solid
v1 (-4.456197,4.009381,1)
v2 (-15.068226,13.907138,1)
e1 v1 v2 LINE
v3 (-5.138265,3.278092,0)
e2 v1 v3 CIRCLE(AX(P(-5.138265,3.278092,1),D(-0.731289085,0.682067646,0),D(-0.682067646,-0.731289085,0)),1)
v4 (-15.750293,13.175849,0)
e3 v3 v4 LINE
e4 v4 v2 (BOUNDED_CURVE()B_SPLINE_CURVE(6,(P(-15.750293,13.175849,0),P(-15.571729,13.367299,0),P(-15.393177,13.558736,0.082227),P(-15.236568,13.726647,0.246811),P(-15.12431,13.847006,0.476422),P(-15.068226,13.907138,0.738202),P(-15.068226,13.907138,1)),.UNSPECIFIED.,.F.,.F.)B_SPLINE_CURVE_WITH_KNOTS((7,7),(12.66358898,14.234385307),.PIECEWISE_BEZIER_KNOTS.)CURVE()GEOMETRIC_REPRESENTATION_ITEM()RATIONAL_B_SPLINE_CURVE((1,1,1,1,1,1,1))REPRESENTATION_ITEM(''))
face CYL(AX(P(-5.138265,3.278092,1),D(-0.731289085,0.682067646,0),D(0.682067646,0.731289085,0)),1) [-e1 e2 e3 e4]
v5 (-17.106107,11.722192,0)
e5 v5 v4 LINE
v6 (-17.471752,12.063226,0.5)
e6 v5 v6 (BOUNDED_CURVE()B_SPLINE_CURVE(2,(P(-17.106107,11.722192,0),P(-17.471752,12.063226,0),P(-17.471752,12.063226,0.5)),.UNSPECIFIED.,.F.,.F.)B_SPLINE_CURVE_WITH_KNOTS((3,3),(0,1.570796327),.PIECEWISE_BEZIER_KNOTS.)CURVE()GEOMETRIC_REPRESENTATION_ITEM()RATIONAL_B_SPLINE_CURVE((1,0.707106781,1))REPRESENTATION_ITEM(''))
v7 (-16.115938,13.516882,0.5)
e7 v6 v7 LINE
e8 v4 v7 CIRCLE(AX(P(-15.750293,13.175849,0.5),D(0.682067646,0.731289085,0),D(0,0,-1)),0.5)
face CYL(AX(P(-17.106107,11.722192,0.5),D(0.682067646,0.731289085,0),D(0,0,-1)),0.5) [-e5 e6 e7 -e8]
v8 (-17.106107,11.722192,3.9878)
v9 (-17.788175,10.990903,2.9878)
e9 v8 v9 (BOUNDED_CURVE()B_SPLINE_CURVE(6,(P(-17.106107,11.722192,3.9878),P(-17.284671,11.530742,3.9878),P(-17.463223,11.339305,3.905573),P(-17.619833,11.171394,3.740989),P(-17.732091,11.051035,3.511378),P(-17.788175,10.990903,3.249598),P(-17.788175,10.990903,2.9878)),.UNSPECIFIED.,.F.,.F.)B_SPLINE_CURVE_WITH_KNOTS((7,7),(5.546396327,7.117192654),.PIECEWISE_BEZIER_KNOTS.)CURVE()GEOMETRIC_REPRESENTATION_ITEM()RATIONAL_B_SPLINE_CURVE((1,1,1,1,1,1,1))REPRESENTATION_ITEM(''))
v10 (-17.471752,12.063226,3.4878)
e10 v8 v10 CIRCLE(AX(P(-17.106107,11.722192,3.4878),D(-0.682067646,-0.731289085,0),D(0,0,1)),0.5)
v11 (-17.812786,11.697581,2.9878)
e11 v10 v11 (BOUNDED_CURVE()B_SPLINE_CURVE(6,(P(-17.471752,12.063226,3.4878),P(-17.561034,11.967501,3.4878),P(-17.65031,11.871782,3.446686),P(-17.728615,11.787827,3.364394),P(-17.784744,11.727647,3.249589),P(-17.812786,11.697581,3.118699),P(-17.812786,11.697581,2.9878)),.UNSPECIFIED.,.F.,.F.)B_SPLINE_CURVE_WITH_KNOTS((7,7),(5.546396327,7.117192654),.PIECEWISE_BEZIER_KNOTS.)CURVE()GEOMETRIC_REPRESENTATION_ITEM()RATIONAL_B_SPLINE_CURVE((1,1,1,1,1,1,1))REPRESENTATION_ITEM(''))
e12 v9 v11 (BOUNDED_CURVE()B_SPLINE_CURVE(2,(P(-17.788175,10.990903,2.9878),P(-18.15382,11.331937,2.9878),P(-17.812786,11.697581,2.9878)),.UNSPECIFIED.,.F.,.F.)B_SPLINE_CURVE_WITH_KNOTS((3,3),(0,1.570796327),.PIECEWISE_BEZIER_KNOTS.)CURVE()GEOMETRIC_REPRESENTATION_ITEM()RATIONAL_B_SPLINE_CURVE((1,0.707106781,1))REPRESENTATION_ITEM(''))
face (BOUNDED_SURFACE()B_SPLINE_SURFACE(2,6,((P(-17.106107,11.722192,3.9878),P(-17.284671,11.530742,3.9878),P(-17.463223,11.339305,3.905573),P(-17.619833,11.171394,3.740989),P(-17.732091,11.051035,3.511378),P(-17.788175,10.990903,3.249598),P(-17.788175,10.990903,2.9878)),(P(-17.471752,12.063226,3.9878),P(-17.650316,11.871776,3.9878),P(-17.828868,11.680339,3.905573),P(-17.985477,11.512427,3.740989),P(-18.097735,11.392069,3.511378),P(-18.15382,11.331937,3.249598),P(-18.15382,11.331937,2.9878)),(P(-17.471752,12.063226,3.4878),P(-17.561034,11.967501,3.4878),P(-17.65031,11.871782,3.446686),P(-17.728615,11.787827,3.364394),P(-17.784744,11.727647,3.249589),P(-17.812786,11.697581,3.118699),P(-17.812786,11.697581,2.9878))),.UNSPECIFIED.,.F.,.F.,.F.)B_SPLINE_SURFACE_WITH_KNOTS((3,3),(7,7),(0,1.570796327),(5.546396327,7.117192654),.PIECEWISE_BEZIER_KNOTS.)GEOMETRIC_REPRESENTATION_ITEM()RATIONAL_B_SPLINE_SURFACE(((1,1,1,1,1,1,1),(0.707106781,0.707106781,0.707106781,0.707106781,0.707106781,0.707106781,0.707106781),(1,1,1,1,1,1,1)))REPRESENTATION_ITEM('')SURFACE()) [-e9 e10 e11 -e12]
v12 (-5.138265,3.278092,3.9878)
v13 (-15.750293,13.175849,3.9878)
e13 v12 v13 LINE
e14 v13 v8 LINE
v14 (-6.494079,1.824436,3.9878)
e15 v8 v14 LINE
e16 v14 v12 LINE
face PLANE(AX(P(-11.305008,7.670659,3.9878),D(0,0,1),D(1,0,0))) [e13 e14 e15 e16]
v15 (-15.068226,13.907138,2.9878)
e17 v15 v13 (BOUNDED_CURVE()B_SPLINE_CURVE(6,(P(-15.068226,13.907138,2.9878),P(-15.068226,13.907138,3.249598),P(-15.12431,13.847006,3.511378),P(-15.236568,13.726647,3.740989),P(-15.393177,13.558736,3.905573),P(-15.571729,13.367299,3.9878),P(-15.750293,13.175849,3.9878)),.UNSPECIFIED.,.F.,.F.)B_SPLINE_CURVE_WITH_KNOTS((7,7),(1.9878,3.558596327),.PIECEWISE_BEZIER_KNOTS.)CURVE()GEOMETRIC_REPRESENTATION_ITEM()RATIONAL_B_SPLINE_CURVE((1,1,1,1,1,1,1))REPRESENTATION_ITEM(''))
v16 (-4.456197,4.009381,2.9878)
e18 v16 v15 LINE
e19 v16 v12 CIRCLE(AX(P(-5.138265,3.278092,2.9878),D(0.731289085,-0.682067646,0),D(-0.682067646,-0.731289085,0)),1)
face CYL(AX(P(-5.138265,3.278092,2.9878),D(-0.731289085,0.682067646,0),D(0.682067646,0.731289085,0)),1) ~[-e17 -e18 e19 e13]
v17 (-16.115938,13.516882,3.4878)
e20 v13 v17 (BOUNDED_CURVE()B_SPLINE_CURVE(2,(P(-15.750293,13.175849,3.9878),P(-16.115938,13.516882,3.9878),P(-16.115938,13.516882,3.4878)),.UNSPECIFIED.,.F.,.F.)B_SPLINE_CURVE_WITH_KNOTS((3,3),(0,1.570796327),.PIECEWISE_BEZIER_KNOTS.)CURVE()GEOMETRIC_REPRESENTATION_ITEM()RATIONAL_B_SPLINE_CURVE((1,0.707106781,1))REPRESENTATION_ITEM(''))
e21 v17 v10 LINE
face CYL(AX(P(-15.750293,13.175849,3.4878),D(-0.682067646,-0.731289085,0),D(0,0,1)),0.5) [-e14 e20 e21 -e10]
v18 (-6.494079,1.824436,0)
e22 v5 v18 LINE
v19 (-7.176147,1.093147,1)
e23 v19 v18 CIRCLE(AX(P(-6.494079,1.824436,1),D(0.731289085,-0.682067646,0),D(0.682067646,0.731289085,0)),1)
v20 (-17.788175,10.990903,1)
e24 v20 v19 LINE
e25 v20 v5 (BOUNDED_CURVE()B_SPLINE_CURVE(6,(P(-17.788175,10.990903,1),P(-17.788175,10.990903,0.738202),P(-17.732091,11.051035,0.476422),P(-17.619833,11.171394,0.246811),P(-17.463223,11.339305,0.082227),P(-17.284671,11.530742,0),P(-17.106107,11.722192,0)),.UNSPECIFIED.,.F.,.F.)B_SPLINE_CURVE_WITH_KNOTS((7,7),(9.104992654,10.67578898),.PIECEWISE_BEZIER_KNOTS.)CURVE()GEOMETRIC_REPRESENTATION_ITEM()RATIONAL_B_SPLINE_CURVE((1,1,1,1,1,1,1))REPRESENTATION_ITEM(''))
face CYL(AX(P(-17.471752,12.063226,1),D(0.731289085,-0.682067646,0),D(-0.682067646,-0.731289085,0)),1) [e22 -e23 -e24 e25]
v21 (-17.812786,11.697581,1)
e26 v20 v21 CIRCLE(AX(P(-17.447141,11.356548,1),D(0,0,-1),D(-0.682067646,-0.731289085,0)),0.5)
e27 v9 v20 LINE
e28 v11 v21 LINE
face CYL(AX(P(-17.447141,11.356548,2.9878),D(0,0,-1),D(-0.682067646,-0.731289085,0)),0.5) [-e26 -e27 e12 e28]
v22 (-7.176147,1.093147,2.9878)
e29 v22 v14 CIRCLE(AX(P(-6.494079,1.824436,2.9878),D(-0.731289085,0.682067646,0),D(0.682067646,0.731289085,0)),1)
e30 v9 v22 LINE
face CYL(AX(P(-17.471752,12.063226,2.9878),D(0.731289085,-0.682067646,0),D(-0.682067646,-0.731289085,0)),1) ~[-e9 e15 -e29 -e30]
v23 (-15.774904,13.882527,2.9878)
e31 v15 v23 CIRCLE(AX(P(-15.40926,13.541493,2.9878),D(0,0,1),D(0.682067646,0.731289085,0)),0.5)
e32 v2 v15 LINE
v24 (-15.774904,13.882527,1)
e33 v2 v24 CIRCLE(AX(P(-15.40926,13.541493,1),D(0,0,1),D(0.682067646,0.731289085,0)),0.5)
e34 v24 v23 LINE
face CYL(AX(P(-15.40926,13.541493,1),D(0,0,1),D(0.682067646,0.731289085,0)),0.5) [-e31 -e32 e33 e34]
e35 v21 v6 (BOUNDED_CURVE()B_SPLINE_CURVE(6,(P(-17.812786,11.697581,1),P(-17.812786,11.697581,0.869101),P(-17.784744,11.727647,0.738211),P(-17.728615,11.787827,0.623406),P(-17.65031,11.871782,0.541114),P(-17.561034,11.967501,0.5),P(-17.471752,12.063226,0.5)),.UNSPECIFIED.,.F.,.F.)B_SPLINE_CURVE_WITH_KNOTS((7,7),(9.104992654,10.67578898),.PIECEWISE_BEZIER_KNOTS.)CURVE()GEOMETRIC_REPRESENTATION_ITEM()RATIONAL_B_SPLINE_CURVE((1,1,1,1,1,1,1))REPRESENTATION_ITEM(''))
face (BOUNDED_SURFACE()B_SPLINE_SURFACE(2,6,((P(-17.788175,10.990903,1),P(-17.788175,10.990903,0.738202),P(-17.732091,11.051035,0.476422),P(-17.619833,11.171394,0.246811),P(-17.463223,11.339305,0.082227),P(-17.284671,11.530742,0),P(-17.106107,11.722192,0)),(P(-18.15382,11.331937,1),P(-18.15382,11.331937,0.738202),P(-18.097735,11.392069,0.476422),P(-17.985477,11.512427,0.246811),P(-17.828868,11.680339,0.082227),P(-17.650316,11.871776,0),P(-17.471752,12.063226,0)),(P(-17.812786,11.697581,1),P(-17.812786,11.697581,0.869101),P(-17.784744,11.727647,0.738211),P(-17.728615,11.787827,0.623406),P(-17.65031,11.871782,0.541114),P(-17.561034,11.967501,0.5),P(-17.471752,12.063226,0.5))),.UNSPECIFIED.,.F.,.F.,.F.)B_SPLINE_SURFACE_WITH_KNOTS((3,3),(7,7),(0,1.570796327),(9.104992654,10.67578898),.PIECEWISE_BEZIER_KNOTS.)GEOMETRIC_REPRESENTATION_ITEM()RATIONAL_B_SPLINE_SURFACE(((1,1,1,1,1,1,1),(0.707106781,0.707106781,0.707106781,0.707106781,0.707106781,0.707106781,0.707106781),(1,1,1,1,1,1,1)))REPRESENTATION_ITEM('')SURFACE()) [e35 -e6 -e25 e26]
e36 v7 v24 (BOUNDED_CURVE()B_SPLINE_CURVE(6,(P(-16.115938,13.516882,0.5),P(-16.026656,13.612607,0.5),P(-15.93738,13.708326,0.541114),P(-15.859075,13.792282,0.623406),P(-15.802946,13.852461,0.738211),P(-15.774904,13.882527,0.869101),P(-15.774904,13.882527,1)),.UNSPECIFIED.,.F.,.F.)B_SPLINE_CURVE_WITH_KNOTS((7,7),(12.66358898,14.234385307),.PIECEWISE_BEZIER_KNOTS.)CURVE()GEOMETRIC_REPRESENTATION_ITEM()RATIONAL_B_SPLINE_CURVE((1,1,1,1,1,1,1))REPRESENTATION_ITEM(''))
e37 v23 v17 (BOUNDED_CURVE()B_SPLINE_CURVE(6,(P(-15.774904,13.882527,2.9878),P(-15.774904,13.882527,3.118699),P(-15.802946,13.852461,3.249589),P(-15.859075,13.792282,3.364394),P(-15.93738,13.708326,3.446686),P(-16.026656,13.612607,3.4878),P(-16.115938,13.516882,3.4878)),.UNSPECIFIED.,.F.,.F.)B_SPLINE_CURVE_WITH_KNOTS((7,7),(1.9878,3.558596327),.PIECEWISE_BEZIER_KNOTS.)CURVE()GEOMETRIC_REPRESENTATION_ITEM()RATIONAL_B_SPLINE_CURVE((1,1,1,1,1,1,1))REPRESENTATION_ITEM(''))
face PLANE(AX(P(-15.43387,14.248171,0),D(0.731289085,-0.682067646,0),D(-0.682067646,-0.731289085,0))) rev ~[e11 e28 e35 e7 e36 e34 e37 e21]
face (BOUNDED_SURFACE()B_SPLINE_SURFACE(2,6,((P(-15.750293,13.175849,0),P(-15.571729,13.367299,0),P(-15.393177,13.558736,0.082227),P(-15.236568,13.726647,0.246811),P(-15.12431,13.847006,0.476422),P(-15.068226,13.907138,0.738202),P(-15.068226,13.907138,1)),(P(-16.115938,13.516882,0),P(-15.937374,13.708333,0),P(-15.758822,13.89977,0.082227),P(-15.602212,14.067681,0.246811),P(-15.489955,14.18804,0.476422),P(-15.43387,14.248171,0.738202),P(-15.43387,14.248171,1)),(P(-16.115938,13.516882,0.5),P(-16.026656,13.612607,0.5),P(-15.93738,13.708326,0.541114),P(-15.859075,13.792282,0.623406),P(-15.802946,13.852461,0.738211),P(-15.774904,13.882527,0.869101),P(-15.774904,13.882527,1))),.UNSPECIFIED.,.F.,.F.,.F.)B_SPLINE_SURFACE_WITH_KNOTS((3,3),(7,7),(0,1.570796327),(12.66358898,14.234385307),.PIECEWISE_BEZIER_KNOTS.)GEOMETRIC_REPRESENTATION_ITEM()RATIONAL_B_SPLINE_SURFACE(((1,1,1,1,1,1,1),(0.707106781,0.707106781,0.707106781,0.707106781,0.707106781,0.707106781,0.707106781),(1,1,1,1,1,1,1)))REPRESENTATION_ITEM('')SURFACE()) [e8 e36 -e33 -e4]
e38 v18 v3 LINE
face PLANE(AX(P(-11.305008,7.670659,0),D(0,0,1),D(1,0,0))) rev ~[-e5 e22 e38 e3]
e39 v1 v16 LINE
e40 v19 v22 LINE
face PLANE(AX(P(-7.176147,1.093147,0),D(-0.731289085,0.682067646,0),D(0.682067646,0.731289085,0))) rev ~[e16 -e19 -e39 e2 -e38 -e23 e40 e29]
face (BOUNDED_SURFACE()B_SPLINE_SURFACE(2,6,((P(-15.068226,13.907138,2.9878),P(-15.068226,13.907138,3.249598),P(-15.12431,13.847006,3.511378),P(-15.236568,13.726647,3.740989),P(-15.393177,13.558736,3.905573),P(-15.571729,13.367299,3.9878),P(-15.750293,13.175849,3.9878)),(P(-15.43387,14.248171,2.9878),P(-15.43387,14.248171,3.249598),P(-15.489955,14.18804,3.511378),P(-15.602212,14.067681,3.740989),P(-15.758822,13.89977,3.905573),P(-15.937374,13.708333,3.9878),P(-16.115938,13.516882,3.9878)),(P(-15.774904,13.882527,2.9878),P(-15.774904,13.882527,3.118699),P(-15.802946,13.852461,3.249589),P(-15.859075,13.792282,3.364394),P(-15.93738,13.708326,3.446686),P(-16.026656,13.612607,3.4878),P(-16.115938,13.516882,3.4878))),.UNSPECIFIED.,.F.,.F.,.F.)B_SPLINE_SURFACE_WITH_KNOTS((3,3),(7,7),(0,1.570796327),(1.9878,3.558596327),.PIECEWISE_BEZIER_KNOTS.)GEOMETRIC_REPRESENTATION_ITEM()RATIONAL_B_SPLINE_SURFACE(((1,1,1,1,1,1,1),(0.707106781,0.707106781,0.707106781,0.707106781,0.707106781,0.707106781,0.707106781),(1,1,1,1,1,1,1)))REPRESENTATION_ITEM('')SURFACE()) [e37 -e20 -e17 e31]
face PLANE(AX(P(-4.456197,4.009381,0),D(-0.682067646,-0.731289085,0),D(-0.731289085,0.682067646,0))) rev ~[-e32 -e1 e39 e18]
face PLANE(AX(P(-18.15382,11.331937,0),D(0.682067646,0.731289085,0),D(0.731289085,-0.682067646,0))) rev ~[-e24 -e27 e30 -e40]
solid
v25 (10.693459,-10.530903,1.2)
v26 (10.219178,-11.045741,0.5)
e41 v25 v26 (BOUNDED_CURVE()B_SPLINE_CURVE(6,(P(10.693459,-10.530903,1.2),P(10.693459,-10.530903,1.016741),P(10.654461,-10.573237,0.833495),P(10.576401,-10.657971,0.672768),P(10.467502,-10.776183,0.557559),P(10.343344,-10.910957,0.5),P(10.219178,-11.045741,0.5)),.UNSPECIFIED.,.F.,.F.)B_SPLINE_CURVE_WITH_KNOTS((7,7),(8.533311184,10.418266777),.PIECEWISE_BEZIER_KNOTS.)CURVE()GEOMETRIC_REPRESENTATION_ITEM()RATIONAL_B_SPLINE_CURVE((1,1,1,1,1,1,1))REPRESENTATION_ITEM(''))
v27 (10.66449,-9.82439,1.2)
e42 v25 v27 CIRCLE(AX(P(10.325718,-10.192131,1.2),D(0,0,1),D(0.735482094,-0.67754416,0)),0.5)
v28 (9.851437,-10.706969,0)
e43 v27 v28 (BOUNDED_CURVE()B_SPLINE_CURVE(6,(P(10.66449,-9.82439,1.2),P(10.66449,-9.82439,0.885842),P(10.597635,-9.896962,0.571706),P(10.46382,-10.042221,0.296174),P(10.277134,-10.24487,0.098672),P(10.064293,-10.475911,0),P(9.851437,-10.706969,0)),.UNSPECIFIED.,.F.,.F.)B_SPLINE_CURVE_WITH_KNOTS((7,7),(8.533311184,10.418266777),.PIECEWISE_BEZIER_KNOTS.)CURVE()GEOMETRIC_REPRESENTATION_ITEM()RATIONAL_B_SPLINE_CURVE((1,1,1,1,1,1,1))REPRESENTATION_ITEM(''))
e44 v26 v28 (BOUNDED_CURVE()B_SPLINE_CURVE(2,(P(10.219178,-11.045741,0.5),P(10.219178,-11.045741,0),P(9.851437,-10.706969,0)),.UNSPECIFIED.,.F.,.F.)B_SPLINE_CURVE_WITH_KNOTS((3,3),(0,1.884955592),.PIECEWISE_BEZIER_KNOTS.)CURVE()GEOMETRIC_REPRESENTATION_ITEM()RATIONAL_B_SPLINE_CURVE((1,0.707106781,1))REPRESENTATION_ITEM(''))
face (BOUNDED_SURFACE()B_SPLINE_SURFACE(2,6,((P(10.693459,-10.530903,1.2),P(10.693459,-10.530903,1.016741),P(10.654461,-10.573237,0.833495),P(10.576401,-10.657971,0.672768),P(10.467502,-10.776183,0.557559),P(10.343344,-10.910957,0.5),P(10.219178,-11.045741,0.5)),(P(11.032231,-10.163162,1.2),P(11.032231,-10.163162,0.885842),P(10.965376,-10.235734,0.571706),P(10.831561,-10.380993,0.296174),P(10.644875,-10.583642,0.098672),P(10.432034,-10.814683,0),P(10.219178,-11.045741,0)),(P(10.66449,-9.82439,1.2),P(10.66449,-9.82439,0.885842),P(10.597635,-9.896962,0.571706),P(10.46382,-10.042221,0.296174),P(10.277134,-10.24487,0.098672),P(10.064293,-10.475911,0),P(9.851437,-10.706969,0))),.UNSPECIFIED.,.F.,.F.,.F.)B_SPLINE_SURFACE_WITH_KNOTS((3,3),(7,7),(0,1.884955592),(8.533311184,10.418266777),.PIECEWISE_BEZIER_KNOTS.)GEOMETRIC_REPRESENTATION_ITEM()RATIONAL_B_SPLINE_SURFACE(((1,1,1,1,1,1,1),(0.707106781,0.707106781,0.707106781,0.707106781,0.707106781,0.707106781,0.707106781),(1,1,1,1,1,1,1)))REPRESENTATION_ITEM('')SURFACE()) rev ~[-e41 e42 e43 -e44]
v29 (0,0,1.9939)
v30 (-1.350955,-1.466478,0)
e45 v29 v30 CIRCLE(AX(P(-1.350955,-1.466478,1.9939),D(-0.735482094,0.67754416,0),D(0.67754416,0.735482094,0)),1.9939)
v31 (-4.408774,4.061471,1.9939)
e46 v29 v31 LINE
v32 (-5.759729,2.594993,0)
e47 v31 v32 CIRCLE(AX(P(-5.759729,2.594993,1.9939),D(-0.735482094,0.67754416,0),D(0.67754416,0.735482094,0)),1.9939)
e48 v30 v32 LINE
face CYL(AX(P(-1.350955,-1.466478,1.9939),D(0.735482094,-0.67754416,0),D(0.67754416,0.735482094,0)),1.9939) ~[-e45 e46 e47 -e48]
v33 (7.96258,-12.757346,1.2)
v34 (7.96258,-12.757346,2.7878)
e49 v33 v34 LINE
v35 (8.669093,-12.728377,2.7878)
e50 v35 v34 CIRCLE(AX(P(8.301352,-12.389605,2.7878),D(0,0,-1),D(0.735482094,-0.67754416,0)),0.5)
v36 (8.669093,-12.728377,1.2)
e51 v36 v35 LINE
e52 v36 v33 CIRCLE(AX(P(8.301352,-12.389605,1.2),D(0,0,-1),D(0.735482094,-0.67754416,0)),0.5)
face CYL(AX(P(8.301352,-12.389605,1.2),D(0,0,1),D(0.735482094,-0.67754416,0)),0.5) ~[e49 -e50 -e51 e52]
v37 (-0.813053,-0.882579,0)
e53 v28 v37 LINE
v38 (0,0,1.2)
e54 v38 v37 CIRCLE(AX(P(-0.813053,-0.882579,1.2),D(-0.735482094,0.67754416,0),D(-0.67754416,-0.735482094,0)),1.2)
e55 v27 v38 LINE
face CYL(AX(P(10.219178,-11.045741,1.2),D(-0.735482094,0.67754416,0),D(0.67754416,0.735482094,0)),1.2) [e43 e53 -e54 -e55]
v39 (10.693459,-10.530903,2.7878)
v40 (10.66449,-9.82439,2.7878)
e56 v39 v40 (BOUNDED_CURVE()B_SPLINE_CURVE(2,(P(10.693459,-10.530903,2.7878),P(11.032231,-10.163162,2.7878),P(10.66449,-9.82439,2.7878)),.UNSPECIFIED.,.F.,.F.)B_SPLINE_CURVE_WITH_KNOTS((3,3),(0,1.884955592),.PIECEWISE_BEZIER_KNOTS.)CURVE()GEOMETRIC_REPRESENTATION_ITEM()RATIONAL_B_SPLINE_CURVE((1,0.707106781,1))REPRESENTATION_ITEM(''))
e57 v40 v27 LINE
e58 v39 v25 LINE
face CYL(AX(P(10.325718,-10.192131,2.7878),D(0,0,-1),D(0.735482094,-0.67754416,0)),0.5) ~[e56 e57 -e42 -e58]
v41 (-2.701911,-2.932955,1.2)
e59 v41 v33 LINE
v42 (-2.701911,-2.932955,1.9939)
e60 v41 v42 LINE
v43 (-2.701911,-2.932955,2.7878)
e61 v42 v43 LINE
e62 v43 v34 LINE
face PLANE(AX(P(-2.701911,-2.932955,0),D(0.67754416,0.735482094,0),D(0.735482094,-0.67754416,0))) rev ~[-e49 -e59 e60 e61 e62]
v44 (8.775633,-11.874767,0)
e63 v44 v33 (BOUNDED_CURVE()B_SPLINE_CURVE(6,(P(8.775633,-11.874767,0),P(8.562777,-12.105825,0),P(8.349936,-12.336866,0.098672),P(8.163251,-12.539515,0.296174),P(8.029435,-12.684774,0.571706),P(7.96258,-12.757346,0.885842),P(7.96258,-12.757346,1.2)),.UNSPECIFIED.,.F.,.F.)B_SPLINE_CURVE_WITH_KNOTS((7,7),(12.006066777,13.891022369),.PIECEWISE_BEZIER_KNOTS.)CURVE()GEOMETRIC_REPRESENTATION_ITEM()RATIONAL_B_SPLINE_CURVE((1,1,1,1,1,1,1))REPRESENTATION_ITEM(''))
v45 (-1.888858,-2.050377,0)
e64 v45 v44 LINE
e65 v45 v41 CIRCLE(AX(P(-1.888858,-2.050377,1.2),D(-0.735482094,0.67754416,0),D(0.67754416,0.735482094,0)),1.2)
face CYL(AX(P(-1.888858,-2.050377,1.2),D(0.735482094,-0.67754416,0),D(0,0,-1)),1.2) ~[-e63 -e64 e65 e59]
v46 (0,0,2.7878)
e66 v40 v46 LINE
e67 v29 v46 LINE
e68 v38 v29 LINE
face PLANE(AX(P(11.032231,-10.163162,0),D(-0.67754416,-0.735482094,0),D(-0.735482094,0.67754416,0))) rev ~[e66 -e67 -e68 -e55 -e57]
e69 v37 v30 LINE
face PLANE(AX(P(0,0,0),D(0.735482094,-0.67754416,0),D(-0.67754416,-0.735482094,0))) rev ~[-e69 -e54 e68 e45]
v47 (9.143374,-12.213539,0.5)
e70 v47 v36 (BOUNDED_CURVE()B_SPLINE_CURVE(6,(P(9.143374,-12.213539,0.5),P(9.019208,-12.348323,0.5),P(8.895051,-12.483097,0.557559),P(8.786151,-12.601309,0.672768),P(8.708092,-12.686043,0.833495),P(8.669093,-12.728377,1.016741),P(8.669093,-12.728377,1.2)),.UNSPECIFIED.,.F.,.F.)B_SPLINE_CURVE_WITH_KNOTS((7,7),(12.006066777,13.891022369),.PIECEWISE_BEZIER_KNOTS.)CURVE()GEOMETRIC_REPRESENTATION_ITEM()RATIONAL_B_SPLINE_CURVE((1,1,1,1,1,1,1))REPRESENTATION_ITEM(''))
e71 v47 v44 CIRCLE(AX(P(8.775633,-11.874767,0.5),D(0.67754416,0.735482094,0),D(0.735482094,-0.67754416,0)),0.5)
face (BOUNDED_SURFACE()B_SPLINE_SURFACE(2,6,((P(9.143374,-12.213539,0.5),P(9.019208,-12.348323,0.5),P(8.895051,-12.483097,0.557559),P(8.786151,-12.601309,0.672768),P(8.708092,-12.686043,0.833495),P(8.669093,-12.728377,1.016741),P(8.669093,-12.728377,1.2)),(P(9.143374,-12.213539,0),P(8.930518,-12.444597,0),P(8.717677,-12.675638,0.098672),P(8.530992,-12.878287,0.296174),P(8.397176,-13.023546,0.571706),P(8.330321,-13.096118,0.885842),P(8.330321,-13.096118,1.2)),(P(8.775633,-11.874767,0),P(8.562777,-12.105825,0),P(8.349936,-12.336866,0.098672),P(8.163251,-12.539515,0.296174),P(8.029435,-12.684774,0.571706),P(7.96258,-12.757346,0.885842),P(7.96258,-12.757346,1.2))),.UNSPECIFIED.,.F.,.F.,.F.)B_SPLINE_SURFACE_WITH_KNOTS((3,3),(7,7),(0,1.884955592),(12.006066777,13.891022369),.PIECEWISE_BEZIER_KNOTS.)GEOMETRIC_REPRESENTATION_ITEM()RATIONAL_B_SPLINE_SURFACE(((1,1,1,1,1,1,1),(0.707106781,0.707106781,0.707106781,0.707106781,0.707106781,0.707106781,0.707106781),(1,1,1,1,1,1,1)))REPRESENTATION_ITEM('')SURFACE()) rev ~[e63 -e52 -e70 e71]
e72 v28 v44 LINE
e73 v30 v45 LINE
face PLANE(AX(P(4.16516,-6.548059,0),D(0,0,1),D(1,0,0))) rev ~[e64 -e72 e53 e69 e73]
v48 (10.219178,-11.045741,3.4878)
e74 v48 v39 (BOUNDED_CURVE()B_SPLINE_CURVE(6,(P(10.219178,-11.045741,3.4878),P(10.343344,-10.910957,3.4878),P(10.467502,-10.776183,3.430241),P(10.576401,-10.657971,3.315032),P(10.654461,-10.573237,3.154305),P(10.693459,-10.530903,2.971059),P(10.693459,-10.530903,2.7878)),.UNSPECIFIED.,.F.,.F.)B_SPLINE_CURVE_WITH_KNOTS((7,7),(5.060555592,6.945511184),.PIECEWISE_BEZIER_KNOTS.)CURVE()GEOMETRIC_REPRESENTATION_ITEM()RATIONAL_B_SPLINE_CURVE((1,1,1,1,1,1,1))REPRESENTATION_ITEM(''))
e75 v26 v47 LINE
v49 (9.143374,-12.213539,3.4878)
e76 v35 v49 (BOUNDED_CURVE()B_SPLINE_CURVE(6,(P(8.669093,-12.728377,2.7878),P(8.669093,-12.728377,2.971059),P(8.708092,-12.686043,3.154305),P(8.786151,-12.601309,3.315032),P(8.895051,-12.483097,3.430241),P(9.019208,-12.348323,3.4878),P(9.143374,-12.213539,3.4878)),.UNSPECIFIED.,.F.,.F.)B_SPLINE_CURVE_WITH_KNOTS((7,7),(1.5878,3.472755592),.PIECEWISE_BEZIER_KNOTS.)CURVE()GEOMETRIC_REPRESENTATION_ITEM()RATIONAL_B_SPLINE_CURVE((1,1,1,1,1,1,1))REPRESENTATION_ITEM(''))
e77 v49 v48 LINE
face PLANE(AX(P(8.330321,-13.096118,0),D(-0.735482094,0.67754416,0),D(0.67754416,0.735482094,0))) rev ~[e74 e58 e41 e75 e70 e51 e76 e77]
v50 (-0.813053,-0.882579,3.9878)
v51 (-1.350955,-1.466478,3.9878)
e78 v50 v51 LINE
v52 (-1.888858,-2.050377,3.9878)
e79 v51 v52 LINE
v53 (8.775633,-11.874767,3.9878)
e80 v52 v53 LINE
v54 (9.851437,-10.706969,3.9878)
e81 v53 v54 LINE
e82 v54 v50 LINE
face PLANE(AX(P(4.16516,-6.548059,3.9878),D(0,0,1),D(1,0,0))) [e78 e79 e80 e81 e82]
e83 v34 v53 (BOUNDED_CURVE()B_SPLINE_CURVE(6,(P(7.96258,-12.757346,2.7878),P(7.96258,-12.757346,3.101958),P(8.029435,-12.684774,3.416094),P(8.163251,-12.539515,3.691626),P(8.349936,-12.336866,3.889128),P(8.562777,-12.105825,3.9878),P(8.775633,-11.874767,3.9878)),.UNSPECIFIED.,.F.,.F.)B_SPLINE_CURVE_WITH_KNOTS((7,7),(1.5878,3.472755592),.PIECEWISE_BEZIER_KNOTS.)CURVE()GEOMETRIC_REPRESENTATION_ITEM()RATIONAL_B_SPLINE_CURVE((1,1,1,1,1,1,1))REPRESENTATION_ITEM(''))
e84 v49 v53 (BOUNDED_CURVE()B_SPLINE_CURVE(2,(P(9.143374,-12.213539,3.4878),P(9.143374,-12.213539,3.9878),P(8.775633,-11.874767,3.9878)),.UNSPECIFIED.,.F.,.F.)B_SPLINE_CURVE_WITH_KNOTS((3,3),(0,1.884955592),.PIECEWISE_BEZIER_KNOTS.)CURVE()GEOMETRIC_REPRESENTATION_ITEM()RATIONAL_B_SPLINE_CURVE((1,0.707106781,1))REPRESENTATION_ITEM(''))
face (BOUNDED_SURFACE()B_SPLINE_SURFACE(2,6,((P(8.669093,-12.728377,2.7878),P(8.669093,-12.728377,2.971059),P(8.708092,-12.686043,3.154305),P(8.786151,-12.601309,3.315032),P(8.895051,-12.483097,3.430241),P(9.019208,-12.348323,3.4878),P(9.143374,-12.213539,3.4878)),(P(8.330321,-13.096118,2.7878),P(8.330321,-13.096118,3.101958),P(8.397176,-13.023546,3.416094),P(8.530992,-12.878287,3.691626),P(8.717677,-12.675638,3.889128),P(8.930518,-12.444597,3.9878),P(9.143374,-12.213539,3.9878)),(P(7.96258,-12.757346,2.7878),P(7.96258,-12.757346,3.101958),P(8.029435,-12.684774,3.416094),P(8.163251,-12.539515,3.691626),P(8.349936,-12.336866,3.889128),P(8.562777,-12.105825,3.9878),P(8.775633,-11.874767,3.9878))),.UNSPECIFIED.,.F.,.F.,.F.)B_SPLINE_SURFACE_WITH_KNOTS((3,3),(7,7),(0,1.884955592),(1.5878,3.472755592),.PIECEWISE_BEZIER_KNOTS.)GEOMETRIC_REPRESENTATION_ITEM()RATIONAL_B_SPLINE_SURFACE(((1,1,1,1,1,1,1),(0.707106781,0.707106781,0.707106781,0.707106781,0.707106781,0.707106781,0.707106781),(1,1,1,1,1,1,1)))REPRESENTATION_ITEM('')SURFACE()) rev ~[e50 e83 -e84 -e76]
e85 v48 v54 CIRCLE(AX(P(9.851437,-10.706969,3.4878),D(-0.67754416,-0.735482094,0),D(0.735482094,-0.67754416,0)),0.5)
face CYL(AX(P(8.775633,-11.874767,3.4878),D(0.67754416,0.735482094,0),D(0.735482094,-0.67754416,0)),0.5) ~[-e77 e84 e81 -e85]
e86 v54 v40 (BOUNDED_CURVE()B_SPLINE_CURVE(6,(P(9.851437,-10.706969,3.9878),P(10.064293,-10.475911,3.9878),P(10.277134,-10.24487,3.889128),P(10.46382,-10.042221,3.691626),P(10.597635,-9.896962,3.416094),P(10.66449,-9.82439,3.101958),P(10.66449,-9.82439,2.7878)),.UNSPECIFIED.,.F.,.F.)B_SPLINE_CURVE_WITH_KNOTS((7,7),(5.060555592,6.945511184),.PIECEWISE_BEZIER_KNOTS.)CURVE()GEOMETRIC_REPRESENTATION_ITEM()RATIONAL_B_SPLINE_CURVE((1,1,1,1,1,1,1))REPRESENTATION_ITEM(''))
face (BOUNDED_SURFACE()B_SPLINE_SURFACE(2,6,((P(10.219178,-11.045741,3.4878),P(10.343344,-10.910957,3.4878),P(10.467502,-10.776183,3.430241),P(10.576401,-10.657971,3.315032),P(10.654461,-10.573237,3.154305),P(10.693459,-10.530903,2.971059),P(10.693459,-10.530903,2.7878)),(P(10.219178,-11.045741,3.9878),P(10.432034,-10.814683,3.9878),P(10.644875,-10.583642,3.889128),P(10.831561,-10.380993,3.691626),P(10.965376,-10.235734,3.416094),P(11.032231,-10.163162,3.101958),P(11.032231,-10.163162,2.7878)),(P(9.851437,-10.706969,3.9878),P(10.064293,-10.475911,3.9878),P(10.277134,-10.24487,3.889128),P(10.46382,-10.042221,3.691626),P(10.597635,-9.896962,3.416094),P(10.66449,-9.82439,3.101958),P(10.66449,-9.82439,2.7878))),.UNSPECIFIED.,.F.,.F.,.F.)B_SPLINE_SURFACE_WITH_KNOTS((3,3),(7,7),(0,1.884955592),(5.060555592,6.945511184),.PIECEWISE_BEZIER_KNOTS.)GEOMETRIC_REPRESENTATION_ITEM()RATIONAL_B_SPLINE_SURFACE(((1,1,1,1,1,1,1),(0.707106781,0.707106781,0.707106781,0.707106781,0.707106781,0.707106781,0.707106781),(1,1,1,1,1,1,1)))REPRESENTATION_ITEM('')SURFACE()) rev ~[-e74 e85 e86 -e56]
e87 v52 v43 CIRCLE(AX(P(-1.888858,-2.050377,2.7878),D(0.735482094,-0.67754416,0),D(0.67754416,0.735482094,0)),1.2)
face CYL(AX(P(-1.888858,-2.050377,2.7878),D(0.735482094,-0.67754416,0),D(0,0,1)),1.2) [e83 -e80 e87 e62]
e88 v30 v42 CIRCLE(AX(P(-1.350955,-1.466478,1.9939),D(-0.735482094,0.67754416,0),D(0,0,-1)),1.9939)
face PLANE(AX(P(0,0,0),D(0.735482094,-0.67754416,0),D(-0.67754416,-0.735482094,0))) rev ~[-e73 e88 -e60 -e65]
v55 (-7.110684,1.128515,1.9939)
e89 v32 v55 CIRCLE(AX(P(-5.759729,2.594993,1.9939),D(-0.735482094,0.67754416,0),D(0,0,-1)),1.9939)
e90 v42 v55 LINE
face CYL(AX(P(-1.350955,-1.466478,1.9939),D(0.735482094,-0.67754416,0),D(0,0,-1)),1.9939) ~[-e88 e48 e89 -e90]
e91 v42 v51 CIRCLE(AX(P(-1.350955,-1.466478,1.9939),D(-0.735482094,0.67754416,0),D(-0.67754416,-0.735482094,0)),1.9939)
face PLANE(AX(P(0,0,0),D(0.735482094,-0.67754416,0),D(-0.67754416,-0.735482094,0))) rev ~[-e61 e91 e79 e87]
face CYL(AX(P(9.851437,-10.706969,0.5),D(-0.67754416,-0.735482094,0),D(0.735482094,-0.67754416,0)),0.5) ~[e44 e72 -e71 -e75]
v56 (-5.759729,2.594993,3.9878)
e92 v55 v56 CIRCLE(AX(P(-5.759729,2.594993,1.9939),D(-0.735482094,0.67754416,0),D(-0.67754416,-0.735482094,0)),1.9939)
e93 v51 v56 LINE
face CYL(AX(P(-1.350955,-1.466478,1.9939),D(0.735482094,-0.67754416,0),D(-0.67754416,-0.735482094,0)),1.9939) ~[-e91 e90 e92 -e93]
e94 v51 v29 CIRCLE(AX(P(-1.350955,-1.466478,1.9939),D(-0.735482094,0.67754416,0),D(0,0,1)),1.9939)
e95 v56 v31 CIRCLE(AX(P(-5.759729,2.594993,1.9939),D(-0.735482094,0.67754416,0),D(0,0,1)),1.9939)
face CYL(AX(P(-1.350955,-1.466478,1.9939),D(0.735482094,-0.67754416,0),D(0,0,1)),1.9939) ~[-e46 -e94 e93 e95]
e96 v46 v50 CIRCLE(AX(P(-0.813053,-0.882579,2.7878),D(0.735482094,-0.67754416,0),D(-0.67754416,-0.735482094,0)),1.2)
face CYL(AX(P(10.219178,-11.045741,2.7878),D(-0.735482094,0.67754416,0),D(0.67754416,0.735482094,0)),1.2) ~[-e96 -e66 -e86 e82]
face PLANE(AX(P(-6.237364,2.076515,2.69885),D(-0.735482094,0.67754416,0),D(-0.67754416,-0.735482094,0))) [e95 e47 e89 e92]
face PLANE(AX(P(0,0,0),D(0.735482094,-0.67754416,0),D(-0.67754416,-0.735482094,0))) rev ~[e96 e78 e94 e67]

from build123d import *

# Parameters (mm, degrees)
F1_DEPTH = 3.9878
F3_DEPTH = 5.9944
F4_R     = 1.2
F5_R     = 1
F6_R     = 0.5
F6_2_R   = 0.5


with BuildPart() as f1:
    # F0 (on Top) → F1 (new body)
    with BuildSketch(Plane.XY):
        Polygon((11.0322314148, -10.163162402), (0, 0), (-2.7019106018, -2.9329554957), (8.330320813, -13.0961178978), align=None)
    extrude(amount=F1_DEPTH)

    # F2 (on face) → F3 (join)
    with BuildSketch(Plane(origin=(0, 0, 0), x_dir=(-0.6775441601, -0.7354820943, 0), z_dir=(-0.7354820943, 0.6775441601, 0))):
        Polygon((3.9878, 1.9939), (1.9939, 3.9878), (1.9939, 1.9939), align=None)
        with BuildLine():
            ThreePointArc((3.9878, 1.9939), (3.403800211, 3.403800211), (1.9939, 3.9878))
            Line((1.9939, 3.9878), (3.9878, 1.9939))
        make_face()
        with BuildLine():
            Line((1.9939, 1.9939), (1.9939, 3.9878))
            ThreePointArc((1.9939, 3.9878), (0.583999789, 3.403800211), (0, 1.9939))
            Line((0, 1.9939), (1.9939, 1.9939))
        make_face()
        with BuildLine():
            Line((3.9878, 1.9939), (1.9939, 1.9939))
            Line((1.9939, 1.9939), (1.9939, 0))
            ThreePointArc((1.9939, 0), (3.403800211, 0.583999789), (3.9878, 1.9939))
        make_face()
        Polygon((1.9939, 0), (1.9939, 1.9939), (0, 1.9939), align=None)
        with BuildLine():
            Line((1.9939, 0), (0, 1.9939))
            ThreePointArc((0, 1.9939), (0.583999789, 0.583999789), (1.9939, 0))
        make_face()
    extrude(amount=F3_DEPTH)

    # F4
    f4_edges = [f1.edges().sort_by_distance(p)[0] for p in [
        (5.516116, -5.081581, 3.9878),
        (5.516116, -5.081581, 0),
        (2.814205, -8.014537, 3.9878),
        (2.814205, -8.014537, 0),
    ]]
    fillet(f4_edges, radius=F4_R)

    # F6
    f6_edges = [f1.edges().sort_by_distance(p)[0] for p in [
        (8.330321, -13.096118, 1.9939),
        (8.568459, -12.837617, 0.351472),
        (8.568459, -12.837617, 3.636328),
        (9.681276, -11.62964, 0),
        (9.681276, -11.62964, 3.9878),
        (10.794094, -10.421664, 0.351472),
        (10.794094, -10.421664, 3.636328),
        (11.032231, -10.163162, 1.9939),
    ]]
    fillet(f6_edges, radius=F6_R)


with BuildPart() as f1b:
    # F0 (on Top) → F1, piece 2 (new body)
    with BuildSketch(Plane.XY):
        Polygon((-7.1761466079, 1.0931465663), (-4.4561972482, 4.0093811798), (-15.4338702201, 14.2481714444), (-18.1538195797, 11.3319368309), align=None)
    extrude(amount=F1_DEPTH)

    # F5
    f5_edges = [f1b.edges().sort_by_distance(p)[0] for p in [
        (-12.664983, 6.212542, 3.9878),
        (-12.664983, 6.212542, 0),
        (-9.945034, 9.128776, 0),
        (-9.945034, 9.128776, 3.9878),
    ]]
    fillet(f5_edges, radius=F5_R)

    # F6#2
    f6_2_edges = [f1b.edges().sort_by_distance(p)[0] for p in [
        (-15.43387, 14.248171, 1.9939),
        (-15.633643, 14.033982, 0.292893),
        (-15.633643, 14.033982, 3.694907),
        (-16.793845, 12.790054, 0),
        (-16.793845, 12.790054, 3.9878),
        (-17.954047, 11.546126, 0.292893),
        (-17.954047, 11.546126, 3.694907),
        (-18.15382, 11.331937, 1.9939),
    ]]
    fillet(f6_2_edges, radius=F6_2_R)


solid = Compound([f1.part, f1b.part])
